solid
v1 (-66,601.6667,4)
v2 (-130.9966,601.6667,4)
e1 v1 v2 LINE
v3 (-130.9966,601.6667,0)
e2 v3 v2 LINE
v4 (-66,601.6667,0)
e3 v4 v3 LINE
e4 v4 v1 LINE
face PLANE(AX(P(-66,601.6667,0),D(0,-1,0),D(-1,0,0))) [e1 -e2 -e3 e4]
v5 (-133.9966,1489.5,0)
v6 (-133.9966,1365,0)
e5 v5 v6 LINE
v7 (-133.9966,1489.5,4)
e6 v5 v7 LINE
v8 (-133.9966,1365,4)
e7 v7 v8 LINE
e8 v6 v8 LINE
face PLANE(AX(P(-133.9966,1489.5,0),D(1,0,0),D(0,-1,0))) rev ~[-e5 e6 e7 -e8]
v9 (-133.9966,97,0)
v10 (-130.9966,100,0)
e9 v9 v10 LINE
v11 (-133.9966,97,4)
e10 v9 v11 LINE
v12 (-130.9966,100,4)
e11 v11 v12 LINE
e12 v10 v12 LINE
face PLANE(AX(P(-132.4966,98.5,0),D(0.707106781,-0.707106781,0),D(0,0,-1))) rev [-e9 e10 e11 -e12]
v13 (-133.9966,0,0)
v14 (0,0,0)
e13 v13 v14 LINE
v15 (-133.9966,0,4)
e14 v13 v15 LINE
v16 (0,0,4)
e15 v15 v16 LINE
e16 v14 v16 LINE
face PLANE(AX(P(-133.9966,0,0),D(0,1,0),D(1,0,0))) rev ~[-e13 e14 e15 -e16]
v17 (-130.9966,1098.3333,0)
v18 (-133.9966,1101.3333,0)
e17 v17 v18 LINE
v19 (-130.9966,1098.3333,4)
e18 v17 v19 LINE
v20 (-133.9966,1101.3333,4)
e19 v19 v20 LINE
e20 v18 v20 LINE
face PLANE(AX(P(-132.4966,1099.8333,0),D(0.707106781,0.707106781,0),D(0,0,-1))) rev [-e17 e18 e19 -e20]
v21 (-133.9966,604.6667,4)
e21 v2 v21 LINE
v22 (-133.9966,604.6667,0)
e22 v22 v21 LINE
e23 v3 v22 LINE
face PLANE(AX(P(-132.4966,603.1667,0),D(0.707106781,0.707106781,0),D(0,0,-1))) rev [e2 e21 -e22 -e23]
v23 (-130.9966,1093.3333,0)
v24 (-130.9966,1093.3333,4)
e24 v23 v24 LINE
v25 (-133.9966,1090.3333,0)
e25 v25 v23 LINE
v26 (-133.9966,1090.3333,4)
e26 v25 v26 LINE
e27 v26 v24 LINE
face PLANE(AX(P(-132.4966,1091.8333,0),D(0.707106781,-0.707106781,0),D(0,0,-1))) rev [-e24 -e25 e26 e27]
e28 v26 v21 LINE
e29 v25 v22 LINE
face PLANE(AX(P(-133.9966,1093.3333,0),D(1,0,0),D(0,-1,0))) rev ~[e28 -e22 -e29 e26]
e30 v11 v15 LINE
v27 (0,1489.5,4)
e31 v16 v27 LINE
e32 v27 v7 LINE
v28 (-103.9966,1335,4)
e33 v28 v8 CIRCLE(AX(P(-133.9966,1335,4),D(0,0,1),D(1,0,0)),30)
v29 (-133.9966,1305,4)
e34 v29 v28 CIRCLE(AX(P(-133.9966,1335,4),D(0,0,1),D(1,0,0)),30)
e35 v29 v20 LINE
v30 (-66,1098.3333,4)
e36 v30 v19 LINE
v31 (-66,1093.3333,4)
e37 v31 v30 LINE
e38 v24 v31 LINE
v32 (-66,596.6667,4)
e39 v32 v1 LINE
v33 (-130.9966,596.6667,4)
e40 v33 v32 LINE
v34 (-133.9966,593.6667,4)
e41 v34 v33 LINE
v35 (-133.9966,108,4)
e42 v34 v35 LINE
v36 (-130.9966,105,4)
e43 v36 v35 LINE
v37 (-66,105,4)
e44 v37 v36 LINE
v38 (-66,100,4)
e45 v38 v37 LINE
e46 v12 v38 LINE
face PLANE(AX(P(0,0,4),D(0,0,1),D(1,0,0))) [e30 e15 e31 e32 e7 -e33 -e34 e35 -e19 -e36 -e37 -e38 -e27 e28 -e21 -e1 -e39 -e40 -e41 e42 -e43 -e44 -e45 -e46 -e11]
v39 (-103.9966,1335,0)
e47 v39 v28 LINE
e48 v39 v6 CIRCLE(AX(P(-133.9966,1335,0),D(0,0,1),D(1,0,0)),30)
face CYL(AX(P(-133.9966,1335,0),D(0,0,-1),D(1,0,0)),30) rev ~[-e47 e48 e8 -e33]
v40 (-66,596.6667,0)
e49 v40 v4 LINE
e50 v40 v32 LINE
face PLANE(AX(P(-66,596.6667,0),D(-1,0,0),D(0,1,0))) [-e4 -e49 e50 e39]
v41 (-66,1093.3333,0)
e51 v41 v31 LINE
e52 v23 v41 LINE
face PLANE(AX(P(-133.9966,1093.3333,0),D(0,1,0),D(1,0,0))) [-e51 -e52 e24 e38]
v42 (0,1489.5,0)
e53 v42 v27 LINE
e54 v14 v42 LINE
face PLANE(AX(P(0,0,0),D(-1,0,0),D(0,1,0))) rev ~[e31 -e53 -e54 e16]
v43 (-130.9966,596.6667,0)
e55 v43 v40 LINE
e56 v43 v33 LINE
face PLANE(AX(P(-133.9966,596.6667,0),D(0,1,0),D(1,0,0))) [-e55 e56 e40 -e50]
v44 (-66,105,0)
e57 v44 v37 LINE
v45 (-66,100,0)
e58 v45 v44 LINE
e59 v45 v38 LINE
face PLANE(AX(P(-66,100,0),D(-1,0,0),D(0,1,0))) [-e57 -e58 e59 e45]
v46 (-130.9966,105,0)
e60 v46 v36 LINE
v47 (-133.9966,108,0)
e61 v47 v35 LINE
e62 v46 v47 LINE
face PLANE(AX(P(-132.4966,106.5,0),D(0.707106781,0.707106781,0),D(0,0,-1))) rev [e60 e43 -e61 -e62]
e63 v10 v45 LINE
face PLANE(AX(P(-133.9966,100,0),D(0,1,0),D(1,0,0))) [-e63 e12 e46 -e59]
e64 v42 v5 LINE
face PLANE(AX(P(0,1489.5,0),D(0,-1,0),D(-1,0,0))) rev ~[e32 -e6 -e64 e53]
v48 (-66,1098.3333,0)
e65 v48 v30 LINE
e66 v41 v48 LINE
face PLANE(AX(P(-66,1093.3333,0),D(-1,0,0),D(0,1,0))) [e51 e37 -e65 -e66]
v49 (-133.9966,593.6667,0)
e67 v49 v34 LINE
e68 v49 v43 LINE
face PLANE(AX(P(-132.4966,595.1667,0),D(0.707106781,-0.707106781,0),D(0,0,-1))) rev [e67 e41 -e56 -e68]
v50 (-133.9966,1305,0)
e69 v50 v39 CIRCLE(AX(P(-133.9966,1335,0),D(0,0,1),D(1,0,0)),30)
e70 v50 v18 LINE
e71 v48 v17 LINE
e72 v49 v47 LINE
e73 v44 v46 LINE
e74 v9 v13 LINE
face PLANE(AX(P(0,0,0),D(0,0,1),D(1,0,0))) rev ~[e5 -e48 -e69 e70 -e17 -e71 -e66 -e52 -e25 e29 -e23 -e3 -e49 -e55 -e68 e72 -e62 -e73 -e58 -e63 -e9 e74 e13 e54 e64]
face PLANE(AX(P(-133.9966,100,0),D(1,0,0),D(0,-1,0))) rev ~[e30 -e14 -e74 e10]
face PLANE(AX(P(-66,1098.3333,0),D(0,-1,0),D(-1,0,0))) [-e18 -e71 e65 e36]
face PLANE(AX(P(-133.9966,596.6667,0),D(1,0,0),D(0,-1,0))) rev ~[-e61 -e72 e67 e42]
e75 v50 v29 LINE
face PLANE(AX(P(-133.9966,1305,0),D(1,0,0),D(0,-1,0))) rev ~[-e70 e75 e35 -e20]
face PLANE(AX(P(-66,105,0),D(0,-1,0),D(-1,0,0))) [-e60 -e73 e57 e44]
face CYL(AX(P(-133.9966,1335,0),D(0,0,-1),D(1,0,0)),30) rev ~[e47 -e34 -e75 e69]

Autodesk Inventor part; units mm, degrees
ref_plane "YZ Plane" through (0, 0, 0) normal (1, 0, 0) x (0, 1, 0)
ref_plane "XZ Plane" through (0, 0, 0) normal (0, 1, 0) x (-1, 0, 0)
ref_plane "XY Plane" through (0, 0, 0) normal (0, 0, 1) x (1, 0, 0)
sketch "Sketch1" plane through (0, 0, 0) normal (0, 0, 1) x (1, 0, 0)
  line L0 (0, 1489.5) -> (-133.9966, 1489.5)
  line L1 (-133.9966, 1489.5) -> (-133.9966, 0)
  line L2 (-133.9966, 0) -> (0, 0)
  line L3 (0, 0) -> (0, 1489.5)
  line L4 (-133.9966, 100) -> (-66, 100)
  line L5 (-66, 100) -> (-66, 105)
  line L6 (-66, 105) -> (-133.9966, 105)
  line L7 (-133.9966, 105) -> (-133.9966, 100)
  line L8 (-133.9966, 596.6667) -> (-66, 596.6667)
  line L9 (-66, 596.6667) -> (-66, 601.6667)
  line L10 (-66, 601.6667) -> (-133.9966, 601.6667)
  line L11 (-133.9966, 601.6667) -> (-133.9966, 596.6667)
  line L12 (-133.9966, 1093.3333) -> (-66, 1093.3333)
  line L13 (-66, 1093.3333) -> (-66, 1098.3333)
  line L14 (-66, 1098.3333) -> (-133.9966, 1098.3333)
  line L15 (-133.9966, 1098.3333) -> (-133.9966, 1093.3333)
  circle A0 centre (-133.9966, 1335) radius 30
  point P0 (-133.9966, 1098.3333)
  point P1 (-133.9966, 1093.3333)
  point P2 (-133.9966, 1365)
  point P3 (-133.9966, 1305)
  dimension "d0" = 1489.5
  dimension "d1" = 133.9966
  dimension "d2" = 5
  dimension "d4" = 100
  dimension "d7" = 496.6667
  dimension "d23" = 66
  dimension "d29" = 60
  dimension "d30" = 1335
extrude "Plate1" add sketch "Sketch1" along normal blind 4 contours L3 L2 L1 L4 L5 L6 L8 L9 L10 L12 L13 L14 A0 L0
chamfer "Corner Chamfer1" distance 3 angle 45 6 edges at (-133.9966, 100, 2) (-133.9966, 105, 2) (-133.9966, 596.6667, 2) (-133.9966, 601.6667, 2) (-133.9966, 1098.3333, 2) (-133.9966, 1093.3333, 2)
equation "\"d0\" = Стрингер_длина"
equation "\"d1\" = стрингер_глубина_6"
equation "\"d2\" = паз_под_стрингер_толщина"
equation "\"d7\" = Шаг_шпангоутов"
equation "\"d23\" = паз_под_стрингер_глубина - Thickness"
equation "\"d29\" = 2 * радиус_выреза_под_сварку"
equation "\"d12\" = Thickness"
equation "\"BendRadius\" = Thickness"
equation "\"BendReliefWidth\" = Thickness"
equation "\"BendReliefDepth\" = 0.5 * Thickness"
equation "\"CornerReliefSize\" = 4 * Thickness"
equation "\"MinimumRemnant\" = 2 * Thickness"
equation "\"TransitionRadius\" = BendRadius"
equation "\"JacobiRadiusSize\" = BendRadius"
equation "\"GapSize\" = Thickness"
equation "\"Стрингер_длина\" = 1489.5"
equation "\"стрингер_глубина_6\" = 133.996634"
equation "\"паз_под_стрингер_толщина\" = 5"
equation "\"Шаг_шпангоутов\" = 496.666667"
equation "\"паз_под_стрингер_глубина\" = 70"
equation "\"Thickness\" = 4"
equation "\"радиус_выреза_под_сварку\" = 30"
properties part number "GBK 3216 stringer 6" material "Steel"
